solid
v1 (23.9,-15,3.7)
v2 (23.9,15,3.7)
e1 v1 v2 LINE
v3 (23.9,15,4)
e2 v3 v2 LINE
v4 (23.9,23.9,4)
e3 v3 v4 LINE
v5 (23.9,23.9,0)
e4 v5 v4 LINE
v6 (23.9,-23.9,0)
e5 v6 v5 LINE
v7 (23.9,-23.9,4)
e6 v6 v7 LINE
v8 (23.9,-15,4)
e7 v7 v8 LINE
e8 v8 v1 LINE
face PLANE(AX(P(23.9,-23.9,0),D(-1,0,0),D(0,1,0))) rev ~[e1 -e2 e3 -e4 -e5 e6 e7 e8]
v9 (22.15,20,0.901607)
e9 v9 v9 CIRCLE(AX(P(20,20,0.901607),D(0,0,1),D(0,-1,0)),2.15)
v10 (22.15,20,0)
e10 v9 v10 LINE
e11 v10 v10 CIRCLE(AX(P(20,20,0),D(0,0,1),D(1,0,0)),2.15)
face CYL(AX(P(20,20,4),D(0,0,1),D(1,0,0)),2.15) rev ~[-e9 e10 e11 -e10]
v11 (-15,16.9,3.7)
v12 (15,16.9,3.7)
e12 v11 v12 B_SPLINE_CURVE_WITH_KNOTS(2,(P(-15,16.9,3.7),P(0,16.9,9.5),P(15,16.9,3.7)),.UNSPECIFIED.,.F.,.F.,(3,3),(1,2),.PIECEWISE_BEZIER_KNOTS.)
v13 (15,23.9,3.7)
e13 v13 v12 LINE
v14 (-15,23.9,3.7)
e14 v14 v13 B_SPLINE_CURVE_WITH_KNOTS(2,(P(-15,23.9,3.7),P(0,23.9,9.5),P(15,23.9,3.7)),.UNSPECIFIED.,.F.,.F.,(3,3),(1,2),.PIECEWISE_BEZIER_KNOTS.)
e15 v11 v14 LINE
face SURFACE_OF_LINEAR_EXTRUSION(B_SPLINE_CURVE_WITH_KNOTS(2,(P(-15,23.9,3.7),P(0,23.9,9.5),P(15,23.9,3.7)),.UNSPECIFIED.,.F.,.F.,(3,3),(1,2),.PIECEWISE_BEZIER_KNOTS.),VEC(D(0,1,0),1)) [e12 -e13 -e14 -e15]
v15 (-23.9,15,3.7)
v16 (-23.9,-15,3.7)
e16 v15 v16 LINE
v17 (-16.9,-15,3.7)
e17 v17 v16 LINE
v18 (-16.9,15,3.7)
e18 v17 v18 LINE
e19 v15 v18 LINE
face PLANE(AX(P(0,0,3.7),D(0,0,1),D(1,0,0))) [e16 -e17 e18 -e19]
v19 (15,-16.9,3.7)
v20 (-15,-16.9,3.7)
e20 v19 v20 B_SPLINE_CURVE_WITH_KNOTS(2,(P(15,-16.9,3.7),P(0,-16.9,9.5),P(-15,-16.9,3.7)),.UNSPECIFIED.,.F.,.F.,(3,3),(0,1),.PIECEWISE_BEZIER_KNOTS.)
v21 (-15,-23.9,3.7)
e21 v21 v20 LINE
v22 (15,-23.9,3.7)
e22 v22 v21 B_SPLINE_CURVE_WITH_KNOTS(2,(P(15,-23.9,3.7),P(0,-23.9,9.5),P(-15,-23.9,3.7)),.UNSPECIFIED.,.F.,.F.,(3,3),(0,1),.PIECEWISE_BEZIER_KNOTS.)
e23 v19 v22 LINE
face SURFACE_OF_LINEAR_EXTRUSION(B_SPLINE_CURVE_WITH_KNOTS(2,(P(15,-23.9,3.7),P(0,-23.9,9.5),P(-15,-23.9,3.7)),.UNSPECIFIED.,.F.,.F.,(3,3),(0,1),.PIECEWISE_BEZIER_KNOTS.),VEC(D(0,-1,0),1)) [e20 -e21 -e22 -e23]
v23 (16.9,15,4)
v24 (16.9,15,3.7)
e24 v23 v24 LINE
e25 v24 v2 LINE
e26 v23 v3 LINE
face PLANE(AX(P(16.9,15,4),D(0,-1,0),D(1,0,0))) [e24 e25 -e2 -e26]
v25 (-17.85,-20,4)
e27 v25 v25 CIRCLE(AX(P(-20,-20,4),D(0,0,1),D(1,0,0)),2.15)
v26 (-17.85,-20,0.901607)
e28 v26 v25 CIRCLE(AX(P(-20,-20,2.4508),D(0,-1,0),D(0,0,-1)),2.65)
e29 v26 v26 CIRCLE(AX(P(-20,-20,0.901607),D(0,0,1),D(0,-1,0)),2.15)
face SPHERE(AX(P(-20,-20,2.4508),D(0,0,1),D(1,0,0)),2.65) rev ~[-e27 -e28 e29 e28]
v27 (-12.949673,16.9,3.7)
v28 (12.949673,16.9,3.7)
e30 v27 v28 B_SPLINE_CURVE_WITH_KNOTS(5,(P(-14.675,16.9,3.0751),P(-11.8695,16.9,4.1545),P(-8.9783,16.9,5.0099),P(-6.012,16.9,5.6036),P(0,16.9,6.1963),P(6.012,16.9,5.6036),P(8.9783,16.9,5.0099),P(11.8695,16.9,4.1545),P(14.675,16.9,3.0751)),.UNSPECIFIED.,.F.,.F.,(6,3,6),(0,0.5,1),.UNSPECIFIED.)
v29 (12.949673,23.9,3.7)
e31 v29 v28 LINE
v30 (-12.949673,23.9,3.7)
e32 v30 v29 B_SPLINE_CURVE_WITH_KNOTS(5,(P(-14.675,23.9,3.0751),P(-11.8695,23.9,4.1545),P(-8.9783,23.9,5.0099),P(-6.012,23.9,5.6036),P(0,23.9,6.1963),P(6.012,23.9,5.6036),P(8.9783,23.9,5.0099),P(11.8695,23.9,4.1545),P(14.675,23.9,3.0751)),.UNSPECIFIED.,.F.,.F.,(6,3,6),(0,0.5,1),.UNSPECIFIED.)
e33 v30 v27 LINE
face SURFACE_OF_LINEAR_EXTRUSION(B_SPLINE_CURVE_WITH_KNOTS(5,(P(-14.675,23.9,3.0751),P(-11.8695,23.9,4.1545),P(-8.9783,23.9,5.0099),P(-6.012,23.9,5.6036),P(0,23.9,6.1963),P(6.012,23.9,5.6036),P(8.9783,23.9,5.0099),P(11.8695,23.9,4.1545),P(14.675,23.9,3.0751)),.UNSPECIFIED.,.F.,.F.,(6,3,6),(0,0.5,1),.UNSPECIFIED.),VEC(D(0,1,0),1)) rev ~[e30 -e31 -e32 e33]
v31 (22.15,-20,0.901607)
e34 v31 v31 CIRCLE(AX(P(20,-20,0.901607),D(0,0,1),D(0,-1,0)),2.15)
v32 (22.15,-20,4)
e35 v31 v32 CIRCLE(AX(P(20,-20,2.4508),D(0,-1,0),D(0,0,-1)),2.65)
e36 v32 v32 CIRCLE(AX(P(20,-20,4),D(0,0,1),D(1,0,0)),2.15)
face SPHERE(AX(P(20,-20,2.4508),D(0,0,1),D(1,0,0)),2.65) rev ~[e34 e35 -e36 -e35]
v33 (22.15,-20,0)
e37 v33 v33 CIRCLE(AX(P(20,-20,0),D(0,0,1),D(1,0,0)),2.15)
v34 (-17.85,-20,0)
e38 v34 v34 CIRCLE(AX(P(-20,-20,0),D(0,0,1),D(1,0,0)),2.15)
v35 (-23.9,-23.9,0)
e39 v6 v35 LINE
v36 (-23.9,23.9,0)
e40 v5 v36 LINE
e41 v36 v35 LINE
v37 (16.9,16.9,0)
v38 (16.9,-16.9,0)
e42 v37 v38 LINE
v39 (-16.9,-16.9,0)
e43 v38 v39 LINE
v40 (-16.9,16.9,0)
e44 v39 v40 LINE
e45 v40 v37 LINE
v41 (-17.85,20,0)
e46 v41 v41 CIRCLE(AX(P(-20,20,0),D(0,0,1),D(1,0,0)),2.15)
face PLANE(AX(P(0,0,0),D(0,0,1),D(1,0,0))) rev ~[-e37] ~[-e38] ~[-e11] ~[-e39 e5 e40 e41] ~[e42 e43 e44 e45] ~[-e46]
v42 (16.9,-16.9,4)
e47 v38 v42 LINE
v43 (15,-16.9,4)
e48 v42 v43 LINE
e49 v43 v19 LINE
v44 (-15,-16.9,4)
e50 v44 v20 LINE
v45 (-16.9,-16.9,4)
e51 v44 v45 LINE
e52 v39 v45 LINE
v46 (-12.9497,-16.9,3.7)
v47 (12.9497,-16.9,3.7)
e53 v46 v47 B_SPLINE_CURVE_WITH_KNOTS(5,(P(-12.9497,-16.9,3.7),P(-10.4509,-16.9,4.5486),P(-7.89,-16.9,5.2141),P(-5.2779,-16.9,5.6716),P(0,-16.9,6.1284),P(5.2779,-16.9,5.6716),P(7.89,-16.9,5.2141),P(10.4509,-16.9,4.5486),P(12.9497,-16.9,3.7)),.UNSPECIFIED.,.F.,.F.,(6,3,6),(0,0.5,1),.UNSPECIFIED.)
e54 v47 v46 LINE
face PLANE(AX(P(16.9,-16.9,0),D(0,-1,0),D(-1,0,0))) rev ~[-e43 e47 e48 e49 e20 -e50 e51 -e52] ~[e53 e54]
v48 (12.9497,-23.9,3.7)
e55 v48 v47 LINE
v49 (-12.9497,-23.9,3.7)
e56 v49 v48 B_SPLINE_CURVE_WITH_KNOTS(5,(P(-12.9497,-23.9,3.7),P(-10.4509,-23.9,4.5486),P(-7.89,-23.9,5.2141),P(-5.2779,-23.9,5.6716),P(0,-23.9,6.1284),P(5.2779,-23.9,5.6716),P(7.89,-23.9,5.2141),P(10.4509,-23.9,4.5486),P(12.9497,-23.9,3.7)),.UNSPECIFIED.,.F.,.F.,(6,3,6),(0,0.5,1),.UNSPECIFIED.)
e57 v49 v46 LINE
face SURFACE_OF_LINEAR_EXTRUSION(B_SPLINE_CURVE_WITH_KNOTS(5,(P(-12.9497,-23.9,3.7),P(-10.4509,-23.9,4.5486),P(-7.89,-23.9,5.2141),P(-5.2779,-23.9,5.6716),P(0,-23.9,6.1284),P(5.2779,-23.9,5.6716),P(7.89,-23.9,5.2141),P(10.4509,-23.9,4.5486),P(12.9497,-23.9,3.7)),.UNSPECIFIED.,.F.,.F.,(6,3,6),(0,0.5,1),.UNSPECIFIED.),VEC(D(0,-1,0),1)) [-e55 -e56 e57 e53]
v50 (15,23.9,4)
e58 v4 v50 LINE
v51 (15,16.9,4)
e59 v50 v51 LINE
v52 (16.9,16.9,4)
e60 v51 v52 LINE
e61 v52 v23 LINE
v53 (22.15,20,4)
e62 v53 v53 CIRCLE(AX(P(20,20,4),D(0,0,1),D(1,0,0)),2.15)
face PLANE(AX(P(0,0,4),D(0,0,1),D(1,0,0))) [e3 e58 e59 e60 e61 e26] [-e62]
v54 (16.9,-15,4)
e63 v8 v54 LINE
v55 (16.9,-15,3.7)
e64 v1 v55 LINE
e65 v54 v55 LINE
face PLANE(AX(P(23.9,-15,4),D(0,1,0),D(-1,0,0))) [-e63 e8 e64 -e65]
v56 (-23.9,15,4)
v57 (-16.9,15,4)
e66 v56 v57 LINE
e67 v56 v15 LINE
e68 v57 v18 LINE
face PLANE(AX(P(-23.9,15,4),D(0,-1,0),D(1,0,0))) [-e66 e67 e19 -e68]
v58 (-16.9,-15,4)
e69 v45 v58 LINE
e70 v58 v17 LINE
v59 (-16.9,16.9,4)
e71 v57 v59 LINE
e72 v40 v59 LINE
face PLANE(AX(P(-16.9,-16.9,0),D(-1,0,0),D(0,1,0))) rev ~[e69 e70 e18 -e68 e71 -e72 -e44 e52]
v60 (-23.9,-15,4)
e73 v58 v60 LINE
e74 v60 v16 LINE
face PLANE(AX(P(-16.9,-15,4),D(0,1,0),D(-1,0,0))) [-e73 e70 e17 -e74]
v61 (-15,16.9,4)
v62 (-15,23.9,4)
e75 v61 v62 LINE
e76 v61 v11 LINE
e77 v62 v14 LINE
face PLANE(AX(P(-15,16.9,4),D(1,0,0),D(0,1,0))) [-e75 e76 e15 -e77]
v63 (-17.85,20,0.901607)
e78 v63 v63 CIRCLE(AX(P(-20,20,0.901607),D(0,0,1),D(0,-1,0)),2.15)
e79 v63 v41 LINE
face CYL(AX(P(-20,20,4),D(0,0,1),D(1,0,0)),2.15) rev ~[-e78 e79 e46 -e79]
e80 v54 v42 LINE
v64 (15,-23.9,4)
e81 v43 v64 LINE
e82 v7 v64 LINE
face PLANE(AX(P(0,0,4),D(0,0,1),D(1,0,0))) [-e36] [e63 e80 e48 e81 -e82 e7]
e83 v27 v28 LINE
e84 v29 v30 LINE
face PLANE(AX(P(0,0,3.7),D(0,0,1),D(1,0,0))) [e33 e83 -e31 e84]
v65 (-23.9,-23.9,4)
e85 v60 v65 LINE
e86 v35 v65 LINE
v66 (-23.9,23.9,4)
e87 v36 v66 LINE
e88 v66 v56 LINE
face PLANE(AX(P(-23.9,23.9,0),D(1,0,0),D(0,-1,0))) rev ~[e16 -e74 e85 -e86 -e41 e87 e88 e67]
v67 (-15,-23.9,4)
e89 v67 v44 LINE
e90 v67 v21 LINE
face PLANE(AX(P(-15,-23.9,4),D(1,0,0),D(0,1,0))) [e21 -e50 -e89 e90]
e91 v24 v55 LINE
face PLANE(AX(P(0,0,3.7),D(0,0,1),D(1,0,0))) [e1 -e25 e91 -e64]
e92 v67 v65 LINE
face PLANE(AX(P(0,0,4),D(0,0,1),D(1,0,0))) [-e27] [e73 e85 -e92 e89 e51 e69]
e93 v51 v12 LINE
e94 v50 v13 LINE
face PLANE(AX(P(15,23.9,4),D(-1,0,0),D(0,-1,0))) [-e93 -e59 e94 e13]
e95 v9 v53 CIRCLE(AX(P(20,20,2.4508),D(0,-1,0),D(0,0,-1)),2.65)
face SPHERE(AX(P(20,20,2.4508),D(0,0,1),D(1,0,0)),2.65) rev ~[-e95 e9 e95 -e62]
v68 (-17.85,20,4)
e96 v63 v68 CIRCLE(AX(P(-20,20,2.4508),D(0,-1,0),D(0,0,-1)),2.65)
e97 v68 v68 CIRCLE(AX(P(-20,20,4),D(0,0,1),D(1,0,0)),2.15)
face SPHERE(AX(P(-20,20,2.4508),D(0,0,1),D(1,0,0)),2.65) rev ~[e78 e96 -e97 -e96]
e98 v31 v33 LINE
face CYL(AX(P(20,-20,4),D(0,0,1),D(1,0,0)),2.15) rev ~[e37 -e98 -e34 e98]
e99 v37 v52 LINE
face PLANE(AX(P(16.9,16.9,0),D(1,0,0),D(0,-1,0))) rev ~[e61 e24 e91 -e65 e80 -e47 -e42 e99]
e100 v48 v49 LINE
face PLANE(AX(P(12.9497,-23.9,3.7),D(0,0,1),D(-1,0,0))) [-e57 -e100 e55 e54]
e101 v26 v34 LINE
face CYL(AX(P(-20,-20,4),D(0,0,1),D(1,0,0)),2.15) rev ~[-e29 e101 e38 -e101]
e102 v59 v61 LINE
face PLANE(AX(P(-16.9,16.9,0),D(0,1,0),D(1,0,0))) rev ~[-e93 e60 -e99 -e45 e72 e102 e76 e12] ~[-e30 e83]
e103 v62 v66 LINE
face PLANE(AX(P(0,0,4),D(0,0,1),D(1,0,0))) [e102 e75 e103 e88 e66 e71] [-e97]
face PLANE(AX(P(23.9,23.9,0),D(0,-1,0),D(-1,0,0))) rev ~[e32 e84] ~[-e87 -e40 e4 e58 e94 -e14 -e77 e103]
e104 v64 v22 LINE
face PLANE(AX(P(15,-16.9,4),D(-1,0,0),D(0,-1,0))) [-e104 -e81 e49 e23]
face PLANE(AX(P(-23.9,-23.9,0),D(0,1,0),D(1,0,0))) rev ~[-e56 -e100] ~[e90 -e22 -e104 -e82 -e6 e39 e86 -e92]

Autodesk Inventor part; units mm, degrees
ref_plane "YZ Plane" through (0, 0, 0) normal (1, 0, 0) x (0, 1, 0)
ref_plane "XZ Plane" through (0, 0, 0) normal (0, 1, 0) x (-1, 0, 0)
ref_plane "XY Plane" through (0, 0, 0) normal (0, 0, 1) x (1, 0, 0)
sketch "Sketch1" plane through (0, 0, 0) normal (0, 0, 1) x (1, 0, 0)
  line L0 (-16.9, -16.9) -> (-16.9, 16.9)
  line L1 (-16.9, 16.9) -> (16.9, 16.9)
  line L2 (16.9, 16.9) -> (16.9, -16.9)
  line L3 (16.9, -16.9) -> (-16.9, -16.9)
  circle A0 centre (-20, 20) radius 2.75
  circle A1 centre (20, -20) radius 2.75
  circle A2 centre (20, 20) radius 2.75
  circle A3 centre (-20, -20) radius 2.75
  line L4 (-22.9, 22.9) -> (22.9, 22.9)
  line L5 (-22.9, -22.9) -> (-22.9, 22.9)
  line L6 (22.9, -22.9) -> (-22.9, -22.9)
  line L7 (22.9, 22.9) -> (22.9, -22.9)
  line L8 (23.9, 23.9) -> (-23.9, 23.9)
  line L9 (-23.9, 23.9) -> (-23.9, -23.9)
  line L10 (-23.9, -23.9) -> (23.9, -23.9)
  line L11 (23.9, -23.9) -> (23.9, 23.9)
  point P0 (0, 0)
  point P1 (0, 0)
  dimension "d8" = 1
extrude "Extrusion1" add sketch "Sketch1" along normal blind 4 contours A0 | A1 | A2 | A3 | L4 L7 L6 L5 | L11 L10 L9 L8
sketch "Sketch2" plane through (0, 0, 4) normal (0, 0, 1) x (1, 0, 0)
  line L0 (-16.9, 16.9) -> (16.9, 16.9) projected
  line L1 (16.9, 16.9) -> (16.9, -16.9) projected
  line L2 (16.9, -16.9) -> (-16.9, -16.9) projected
  line L3 (-16.9, -16.9) -> (-16.9, 16.9) projected
  line L4 (-16.9, -16.9) -> (-16.9, 16.9)
  line L5 (-16.9, 16.9) -> (16.9, 16.9)
  line L6 (16.9, 16.9) -> (16.9, -16.9)
  line L7 (16.9, -16.9) -> (-16.9, -16.9)
  circle A0 centre (-20, 20) radius 2.15
  circle A1 centre (20, -20) radius 2.15
  circle A2 centre (20, 20) radius 2.15
  circle A3 centre (-20, -20) radius 2.15
  line L8 (-22.9, 22.9) -> (22.9, 22.9)
  line L9 (-22.9, -22.9) -> (-22.9, 22.9)
  line L10 (22.9, -22.9) -> (-22.9, -22.9)
  line L11 (22.9, 22.9) -> (22.9, -22.9)
  point P0 (0, 0)
  point P1 (0, 0)
  dimension "d2" = 4.3
  dimension "d3" = 4.3
  dimension "d4" = 4.3
  dimension "d5" = 4.3
extrude "Extrusion2" cut sketch "Sketch2" against normal through all contours A0 | A1 | A2 | A3
ref_plane "Work Plane1" through (-20, -20, 4) normal (0, -1, 0) x (1, 0, 0)
sketch "Sketch3" plane through (-20, -20, 4) normal (0, -1, 0) x (1, 0, 0)
  line L0 (2.15, -4) -> (-2.15, -4) projected
  line L1 (-2.15, 0) -> (2.15, 0) projected
  line L2 (43.9, -4) -> (-3.9, -4) projected
  line L3 (-3.9, -4) -> (-3.9, 0) projected
  line L4 (43.9, 0) -> (-3.9, 0) projected
  line L5 (43.9, -4) -> (43.9, 0) projected
  line L6 (0, 2.9614) -> (0, -7.6552) construction
  arc A0 (-2.15, 0) -> (0, -4.1992) centre (0, -1.5492) ccw
  line L7 (0, 1.1008) -> (0, -4.1992)
  arc A1 (0, 1.1008) -> (-2.15, 0) centre (0, -1.5492) ccw
  arc A2 (0, -4.1992) -> (0, 1.1008) centre (0, -1.5492) ccw
  point P0 (20, -4)
  point P1 (0, -4)
  dimension "d10" = 5.3
revolve "Revolution1" cut sketch "Sketch3" angle 360 about axis through (-20, -20, 5.1008) along (0, 0, -1) contours A2 L7 L0 | L0 L7 L1 A2 | L1 L7 A2
pattern_linear "Rectangular Pattern1" count 2 spacing 40 along (1, 0, 0) count 2 spacing 40 along (0, 1, 0) of "Revolution1"
sketch "Sketch4" plane through (0, 0, 4) normal (0, 0, 1) x (1, 0, 0)
  circle A0 centre (20, 20) radius 2.15 projected
  circle A1 centre (-20, 20) radius 2.15 projected
  circle A2 centre (20, -20) radius 2.15 projected
  circle A3 centre (-20, -20) radius 2.15 projected
  line L0 (-16.9, 16.9) -> (16.9, 16.9) projected
  line L1 (16.9, 16.9) -> (16.9, -16.9) projected
  line L2 (16.9, -16.9) -> (-16.9, -16.9) projected
  line L3 (-16.9, -16.9) -> (-16.9, 16.9) projected
  line L4 (23.9, 23.9) -> (-23.9, 23.9) projected
  line L5 (-23.9, 23.9) -> (-23.9, -23.9) projected
  line L6 (-23.9, -23.9) -> (23.9, -23.9) projected
  line L7 (23.9, -23.9) -> (23.9, 23.9) projected
  line L8 (-33.46, 0) -> (33.46, 0) construction
  line L9 (0, -33.46) -> (0, 33.46) construction
  line L10 (-15, 23.9) -> (15, 23.9)
  line L11 (15, 23.9) -> (15, 16.9)
  line L12 (15, 16.9) -> (-15, 16.9)
  line L13 (-15, 16.9) -> (-15, 23.9)
  line L14 (-23.9, -15) -> (-23.9, 15)
  line L15 (-16.9, -15) -> (-23.9, -15)
  line L16 (-16.9, 15) -> (-16.9, -15)
  line L17 (-23.9, 15) -> (-16.9, 15)
  line L18 (15, -23.9) -> (-15, -23.9)
  line L19 (15, -16.9) -> (15, -23.9)
  line L20 (-15, -16.9) -> (15, -16.9)
  line L21 (-15, -23.9) -> (-15, -16.9)
  line L22 (23.9, 15) -> (23.9, -15)
  line L23 (16.9, 15) -> (23.9, 15)
  line L24 (16.9, -15) -> (16.9, 15)
  line L25 (23.9, -15) -> (16.9, -15)
  point P0 (0, 0)
  dimension "d18" = 30
  dimension "d21" = 360
extrude "Extrusion3" cut sketch "Sketch4" against normal blind 0.3 contours L13 L4 L11 L0 | L3 L15 L5 L17 | L23 L7 L25 L1 | L2 L19 L6 L21
sketch "Sketch5" plane through (-23.9, 23.9, 0) normal (0, 1, 0) x (1, 0, 0)
  line L0 (38.9, -3.7) -> (38.9, -4) construction
  line L1 (47.8, -4) -> (38.9, -4) construction
  line L2 (47.8, 0) -> (47.8, -4) construction
  line L3 (47.8, 0) -> (0, 0) construction
  line L4 (0, 0) -> (0, -4) construction
  line L5 (8.9, -4) -> (0, -4) construction
  line L6 (8.9, -4) -> (8.9, -3.7) construction
  line L7 (8.9, -3.7) -> (38.9, -3.7) construction
  line L8 (23.9, 0) -> (23.9, -19.2449) construction
  line L9 (38.9, -3.7) -> (8.9, -3.7) projected
  line L10 (8.9, -3.7) -> (23.9, -9.5) construction
  line L11 (23.9, -9.5) -> (38.9, -3.7) construction
  spline S0 degree 2 poles (8.9, -3.7) (23.9, -9.5) (38.9, -3.7) knots 1 1 1 2 2 2
  line L12 (23.9, -3.7) -> (23.9, -6.6) construction
  line L13 (9.225, -3.0751) -> (8.9, -3.7)
  line L14 (38.9, -4) -> (38.9, -3.7) projected
  line L15 (38.575, -3.0751) -> (38.9, -3.7)
  spline S1 degree 5 poles (9.225, -3.0751) (12.0305, -4.1545) (14.9217, -5.0099) (17.888, -5.6036) (23.9, -6.1963) (29.912, -5.6036) (32.8783, -5.0099) (35.7695, -4.1545) (38.575, -3.0751) knots 0 0 0 0 0 0 0.5 0.5 0.5 1 1 1 1 1 1
  dimension "d26" = 0.7
  dimension "d25" = 2.9
extrude "Extrusion4" add sketch "Sketch5" against normal up to surface (7 mm away) contours S0 L9 S1 | L9 S1 L15 | L13 S1 L9
sketch "Sketch6" plane through (-23.9, -23.9, 0) normal (0, -1, 0) x (1, 0, 0)
  line L0 (36.8497, 3.7) -> (10.9503, 3.7) projected
  spline S0 degree 5 poles (10.9504, 3.7) (13.4491, 4.5486) (16.01, 5.2141) (18.6221, 5.6716) (23.9, 6.1284) (29.1779, 5.6716) (31.79, 5.2141) (34.3509, 4.5486) (36.8496, 3.7) knots 0 0 0 0 0 0 0.5 0.5 0.5 1 1 1 1 1 1 projected
  spline S1 degree 2 poles (38.9, 3.7) (23.9, 9.5) (8.9, 3.7) knots 0 0 0 1 1 1 projected
  line L1 (8.9, 3.7) -> (8.9, 4) projected
  line L2 (7, 4) -> (8.9, 4) projected
  line L3 (7, 0) -> (7, 4) projected
  line L4 (40.8, 0) -> (7, 0) projected
  line L5 (40.8, 0) -> (40.8, 4) projected
  line L6 (38.9, 4) -> (40.8, 4) projected
  line L7 (38.9, 4) -> (38.9, 3.7) projected
  point P0 (23.9, 0)
extrude "Extrusion5" add sketch "Sketch6" against normal up to surface (7 mm away)
equation "\"d3\" = d2"
equation "\"d4\" = d2"
equation "\"d5\" = d2"
properties part number "30_Sampleclamp_generic"
